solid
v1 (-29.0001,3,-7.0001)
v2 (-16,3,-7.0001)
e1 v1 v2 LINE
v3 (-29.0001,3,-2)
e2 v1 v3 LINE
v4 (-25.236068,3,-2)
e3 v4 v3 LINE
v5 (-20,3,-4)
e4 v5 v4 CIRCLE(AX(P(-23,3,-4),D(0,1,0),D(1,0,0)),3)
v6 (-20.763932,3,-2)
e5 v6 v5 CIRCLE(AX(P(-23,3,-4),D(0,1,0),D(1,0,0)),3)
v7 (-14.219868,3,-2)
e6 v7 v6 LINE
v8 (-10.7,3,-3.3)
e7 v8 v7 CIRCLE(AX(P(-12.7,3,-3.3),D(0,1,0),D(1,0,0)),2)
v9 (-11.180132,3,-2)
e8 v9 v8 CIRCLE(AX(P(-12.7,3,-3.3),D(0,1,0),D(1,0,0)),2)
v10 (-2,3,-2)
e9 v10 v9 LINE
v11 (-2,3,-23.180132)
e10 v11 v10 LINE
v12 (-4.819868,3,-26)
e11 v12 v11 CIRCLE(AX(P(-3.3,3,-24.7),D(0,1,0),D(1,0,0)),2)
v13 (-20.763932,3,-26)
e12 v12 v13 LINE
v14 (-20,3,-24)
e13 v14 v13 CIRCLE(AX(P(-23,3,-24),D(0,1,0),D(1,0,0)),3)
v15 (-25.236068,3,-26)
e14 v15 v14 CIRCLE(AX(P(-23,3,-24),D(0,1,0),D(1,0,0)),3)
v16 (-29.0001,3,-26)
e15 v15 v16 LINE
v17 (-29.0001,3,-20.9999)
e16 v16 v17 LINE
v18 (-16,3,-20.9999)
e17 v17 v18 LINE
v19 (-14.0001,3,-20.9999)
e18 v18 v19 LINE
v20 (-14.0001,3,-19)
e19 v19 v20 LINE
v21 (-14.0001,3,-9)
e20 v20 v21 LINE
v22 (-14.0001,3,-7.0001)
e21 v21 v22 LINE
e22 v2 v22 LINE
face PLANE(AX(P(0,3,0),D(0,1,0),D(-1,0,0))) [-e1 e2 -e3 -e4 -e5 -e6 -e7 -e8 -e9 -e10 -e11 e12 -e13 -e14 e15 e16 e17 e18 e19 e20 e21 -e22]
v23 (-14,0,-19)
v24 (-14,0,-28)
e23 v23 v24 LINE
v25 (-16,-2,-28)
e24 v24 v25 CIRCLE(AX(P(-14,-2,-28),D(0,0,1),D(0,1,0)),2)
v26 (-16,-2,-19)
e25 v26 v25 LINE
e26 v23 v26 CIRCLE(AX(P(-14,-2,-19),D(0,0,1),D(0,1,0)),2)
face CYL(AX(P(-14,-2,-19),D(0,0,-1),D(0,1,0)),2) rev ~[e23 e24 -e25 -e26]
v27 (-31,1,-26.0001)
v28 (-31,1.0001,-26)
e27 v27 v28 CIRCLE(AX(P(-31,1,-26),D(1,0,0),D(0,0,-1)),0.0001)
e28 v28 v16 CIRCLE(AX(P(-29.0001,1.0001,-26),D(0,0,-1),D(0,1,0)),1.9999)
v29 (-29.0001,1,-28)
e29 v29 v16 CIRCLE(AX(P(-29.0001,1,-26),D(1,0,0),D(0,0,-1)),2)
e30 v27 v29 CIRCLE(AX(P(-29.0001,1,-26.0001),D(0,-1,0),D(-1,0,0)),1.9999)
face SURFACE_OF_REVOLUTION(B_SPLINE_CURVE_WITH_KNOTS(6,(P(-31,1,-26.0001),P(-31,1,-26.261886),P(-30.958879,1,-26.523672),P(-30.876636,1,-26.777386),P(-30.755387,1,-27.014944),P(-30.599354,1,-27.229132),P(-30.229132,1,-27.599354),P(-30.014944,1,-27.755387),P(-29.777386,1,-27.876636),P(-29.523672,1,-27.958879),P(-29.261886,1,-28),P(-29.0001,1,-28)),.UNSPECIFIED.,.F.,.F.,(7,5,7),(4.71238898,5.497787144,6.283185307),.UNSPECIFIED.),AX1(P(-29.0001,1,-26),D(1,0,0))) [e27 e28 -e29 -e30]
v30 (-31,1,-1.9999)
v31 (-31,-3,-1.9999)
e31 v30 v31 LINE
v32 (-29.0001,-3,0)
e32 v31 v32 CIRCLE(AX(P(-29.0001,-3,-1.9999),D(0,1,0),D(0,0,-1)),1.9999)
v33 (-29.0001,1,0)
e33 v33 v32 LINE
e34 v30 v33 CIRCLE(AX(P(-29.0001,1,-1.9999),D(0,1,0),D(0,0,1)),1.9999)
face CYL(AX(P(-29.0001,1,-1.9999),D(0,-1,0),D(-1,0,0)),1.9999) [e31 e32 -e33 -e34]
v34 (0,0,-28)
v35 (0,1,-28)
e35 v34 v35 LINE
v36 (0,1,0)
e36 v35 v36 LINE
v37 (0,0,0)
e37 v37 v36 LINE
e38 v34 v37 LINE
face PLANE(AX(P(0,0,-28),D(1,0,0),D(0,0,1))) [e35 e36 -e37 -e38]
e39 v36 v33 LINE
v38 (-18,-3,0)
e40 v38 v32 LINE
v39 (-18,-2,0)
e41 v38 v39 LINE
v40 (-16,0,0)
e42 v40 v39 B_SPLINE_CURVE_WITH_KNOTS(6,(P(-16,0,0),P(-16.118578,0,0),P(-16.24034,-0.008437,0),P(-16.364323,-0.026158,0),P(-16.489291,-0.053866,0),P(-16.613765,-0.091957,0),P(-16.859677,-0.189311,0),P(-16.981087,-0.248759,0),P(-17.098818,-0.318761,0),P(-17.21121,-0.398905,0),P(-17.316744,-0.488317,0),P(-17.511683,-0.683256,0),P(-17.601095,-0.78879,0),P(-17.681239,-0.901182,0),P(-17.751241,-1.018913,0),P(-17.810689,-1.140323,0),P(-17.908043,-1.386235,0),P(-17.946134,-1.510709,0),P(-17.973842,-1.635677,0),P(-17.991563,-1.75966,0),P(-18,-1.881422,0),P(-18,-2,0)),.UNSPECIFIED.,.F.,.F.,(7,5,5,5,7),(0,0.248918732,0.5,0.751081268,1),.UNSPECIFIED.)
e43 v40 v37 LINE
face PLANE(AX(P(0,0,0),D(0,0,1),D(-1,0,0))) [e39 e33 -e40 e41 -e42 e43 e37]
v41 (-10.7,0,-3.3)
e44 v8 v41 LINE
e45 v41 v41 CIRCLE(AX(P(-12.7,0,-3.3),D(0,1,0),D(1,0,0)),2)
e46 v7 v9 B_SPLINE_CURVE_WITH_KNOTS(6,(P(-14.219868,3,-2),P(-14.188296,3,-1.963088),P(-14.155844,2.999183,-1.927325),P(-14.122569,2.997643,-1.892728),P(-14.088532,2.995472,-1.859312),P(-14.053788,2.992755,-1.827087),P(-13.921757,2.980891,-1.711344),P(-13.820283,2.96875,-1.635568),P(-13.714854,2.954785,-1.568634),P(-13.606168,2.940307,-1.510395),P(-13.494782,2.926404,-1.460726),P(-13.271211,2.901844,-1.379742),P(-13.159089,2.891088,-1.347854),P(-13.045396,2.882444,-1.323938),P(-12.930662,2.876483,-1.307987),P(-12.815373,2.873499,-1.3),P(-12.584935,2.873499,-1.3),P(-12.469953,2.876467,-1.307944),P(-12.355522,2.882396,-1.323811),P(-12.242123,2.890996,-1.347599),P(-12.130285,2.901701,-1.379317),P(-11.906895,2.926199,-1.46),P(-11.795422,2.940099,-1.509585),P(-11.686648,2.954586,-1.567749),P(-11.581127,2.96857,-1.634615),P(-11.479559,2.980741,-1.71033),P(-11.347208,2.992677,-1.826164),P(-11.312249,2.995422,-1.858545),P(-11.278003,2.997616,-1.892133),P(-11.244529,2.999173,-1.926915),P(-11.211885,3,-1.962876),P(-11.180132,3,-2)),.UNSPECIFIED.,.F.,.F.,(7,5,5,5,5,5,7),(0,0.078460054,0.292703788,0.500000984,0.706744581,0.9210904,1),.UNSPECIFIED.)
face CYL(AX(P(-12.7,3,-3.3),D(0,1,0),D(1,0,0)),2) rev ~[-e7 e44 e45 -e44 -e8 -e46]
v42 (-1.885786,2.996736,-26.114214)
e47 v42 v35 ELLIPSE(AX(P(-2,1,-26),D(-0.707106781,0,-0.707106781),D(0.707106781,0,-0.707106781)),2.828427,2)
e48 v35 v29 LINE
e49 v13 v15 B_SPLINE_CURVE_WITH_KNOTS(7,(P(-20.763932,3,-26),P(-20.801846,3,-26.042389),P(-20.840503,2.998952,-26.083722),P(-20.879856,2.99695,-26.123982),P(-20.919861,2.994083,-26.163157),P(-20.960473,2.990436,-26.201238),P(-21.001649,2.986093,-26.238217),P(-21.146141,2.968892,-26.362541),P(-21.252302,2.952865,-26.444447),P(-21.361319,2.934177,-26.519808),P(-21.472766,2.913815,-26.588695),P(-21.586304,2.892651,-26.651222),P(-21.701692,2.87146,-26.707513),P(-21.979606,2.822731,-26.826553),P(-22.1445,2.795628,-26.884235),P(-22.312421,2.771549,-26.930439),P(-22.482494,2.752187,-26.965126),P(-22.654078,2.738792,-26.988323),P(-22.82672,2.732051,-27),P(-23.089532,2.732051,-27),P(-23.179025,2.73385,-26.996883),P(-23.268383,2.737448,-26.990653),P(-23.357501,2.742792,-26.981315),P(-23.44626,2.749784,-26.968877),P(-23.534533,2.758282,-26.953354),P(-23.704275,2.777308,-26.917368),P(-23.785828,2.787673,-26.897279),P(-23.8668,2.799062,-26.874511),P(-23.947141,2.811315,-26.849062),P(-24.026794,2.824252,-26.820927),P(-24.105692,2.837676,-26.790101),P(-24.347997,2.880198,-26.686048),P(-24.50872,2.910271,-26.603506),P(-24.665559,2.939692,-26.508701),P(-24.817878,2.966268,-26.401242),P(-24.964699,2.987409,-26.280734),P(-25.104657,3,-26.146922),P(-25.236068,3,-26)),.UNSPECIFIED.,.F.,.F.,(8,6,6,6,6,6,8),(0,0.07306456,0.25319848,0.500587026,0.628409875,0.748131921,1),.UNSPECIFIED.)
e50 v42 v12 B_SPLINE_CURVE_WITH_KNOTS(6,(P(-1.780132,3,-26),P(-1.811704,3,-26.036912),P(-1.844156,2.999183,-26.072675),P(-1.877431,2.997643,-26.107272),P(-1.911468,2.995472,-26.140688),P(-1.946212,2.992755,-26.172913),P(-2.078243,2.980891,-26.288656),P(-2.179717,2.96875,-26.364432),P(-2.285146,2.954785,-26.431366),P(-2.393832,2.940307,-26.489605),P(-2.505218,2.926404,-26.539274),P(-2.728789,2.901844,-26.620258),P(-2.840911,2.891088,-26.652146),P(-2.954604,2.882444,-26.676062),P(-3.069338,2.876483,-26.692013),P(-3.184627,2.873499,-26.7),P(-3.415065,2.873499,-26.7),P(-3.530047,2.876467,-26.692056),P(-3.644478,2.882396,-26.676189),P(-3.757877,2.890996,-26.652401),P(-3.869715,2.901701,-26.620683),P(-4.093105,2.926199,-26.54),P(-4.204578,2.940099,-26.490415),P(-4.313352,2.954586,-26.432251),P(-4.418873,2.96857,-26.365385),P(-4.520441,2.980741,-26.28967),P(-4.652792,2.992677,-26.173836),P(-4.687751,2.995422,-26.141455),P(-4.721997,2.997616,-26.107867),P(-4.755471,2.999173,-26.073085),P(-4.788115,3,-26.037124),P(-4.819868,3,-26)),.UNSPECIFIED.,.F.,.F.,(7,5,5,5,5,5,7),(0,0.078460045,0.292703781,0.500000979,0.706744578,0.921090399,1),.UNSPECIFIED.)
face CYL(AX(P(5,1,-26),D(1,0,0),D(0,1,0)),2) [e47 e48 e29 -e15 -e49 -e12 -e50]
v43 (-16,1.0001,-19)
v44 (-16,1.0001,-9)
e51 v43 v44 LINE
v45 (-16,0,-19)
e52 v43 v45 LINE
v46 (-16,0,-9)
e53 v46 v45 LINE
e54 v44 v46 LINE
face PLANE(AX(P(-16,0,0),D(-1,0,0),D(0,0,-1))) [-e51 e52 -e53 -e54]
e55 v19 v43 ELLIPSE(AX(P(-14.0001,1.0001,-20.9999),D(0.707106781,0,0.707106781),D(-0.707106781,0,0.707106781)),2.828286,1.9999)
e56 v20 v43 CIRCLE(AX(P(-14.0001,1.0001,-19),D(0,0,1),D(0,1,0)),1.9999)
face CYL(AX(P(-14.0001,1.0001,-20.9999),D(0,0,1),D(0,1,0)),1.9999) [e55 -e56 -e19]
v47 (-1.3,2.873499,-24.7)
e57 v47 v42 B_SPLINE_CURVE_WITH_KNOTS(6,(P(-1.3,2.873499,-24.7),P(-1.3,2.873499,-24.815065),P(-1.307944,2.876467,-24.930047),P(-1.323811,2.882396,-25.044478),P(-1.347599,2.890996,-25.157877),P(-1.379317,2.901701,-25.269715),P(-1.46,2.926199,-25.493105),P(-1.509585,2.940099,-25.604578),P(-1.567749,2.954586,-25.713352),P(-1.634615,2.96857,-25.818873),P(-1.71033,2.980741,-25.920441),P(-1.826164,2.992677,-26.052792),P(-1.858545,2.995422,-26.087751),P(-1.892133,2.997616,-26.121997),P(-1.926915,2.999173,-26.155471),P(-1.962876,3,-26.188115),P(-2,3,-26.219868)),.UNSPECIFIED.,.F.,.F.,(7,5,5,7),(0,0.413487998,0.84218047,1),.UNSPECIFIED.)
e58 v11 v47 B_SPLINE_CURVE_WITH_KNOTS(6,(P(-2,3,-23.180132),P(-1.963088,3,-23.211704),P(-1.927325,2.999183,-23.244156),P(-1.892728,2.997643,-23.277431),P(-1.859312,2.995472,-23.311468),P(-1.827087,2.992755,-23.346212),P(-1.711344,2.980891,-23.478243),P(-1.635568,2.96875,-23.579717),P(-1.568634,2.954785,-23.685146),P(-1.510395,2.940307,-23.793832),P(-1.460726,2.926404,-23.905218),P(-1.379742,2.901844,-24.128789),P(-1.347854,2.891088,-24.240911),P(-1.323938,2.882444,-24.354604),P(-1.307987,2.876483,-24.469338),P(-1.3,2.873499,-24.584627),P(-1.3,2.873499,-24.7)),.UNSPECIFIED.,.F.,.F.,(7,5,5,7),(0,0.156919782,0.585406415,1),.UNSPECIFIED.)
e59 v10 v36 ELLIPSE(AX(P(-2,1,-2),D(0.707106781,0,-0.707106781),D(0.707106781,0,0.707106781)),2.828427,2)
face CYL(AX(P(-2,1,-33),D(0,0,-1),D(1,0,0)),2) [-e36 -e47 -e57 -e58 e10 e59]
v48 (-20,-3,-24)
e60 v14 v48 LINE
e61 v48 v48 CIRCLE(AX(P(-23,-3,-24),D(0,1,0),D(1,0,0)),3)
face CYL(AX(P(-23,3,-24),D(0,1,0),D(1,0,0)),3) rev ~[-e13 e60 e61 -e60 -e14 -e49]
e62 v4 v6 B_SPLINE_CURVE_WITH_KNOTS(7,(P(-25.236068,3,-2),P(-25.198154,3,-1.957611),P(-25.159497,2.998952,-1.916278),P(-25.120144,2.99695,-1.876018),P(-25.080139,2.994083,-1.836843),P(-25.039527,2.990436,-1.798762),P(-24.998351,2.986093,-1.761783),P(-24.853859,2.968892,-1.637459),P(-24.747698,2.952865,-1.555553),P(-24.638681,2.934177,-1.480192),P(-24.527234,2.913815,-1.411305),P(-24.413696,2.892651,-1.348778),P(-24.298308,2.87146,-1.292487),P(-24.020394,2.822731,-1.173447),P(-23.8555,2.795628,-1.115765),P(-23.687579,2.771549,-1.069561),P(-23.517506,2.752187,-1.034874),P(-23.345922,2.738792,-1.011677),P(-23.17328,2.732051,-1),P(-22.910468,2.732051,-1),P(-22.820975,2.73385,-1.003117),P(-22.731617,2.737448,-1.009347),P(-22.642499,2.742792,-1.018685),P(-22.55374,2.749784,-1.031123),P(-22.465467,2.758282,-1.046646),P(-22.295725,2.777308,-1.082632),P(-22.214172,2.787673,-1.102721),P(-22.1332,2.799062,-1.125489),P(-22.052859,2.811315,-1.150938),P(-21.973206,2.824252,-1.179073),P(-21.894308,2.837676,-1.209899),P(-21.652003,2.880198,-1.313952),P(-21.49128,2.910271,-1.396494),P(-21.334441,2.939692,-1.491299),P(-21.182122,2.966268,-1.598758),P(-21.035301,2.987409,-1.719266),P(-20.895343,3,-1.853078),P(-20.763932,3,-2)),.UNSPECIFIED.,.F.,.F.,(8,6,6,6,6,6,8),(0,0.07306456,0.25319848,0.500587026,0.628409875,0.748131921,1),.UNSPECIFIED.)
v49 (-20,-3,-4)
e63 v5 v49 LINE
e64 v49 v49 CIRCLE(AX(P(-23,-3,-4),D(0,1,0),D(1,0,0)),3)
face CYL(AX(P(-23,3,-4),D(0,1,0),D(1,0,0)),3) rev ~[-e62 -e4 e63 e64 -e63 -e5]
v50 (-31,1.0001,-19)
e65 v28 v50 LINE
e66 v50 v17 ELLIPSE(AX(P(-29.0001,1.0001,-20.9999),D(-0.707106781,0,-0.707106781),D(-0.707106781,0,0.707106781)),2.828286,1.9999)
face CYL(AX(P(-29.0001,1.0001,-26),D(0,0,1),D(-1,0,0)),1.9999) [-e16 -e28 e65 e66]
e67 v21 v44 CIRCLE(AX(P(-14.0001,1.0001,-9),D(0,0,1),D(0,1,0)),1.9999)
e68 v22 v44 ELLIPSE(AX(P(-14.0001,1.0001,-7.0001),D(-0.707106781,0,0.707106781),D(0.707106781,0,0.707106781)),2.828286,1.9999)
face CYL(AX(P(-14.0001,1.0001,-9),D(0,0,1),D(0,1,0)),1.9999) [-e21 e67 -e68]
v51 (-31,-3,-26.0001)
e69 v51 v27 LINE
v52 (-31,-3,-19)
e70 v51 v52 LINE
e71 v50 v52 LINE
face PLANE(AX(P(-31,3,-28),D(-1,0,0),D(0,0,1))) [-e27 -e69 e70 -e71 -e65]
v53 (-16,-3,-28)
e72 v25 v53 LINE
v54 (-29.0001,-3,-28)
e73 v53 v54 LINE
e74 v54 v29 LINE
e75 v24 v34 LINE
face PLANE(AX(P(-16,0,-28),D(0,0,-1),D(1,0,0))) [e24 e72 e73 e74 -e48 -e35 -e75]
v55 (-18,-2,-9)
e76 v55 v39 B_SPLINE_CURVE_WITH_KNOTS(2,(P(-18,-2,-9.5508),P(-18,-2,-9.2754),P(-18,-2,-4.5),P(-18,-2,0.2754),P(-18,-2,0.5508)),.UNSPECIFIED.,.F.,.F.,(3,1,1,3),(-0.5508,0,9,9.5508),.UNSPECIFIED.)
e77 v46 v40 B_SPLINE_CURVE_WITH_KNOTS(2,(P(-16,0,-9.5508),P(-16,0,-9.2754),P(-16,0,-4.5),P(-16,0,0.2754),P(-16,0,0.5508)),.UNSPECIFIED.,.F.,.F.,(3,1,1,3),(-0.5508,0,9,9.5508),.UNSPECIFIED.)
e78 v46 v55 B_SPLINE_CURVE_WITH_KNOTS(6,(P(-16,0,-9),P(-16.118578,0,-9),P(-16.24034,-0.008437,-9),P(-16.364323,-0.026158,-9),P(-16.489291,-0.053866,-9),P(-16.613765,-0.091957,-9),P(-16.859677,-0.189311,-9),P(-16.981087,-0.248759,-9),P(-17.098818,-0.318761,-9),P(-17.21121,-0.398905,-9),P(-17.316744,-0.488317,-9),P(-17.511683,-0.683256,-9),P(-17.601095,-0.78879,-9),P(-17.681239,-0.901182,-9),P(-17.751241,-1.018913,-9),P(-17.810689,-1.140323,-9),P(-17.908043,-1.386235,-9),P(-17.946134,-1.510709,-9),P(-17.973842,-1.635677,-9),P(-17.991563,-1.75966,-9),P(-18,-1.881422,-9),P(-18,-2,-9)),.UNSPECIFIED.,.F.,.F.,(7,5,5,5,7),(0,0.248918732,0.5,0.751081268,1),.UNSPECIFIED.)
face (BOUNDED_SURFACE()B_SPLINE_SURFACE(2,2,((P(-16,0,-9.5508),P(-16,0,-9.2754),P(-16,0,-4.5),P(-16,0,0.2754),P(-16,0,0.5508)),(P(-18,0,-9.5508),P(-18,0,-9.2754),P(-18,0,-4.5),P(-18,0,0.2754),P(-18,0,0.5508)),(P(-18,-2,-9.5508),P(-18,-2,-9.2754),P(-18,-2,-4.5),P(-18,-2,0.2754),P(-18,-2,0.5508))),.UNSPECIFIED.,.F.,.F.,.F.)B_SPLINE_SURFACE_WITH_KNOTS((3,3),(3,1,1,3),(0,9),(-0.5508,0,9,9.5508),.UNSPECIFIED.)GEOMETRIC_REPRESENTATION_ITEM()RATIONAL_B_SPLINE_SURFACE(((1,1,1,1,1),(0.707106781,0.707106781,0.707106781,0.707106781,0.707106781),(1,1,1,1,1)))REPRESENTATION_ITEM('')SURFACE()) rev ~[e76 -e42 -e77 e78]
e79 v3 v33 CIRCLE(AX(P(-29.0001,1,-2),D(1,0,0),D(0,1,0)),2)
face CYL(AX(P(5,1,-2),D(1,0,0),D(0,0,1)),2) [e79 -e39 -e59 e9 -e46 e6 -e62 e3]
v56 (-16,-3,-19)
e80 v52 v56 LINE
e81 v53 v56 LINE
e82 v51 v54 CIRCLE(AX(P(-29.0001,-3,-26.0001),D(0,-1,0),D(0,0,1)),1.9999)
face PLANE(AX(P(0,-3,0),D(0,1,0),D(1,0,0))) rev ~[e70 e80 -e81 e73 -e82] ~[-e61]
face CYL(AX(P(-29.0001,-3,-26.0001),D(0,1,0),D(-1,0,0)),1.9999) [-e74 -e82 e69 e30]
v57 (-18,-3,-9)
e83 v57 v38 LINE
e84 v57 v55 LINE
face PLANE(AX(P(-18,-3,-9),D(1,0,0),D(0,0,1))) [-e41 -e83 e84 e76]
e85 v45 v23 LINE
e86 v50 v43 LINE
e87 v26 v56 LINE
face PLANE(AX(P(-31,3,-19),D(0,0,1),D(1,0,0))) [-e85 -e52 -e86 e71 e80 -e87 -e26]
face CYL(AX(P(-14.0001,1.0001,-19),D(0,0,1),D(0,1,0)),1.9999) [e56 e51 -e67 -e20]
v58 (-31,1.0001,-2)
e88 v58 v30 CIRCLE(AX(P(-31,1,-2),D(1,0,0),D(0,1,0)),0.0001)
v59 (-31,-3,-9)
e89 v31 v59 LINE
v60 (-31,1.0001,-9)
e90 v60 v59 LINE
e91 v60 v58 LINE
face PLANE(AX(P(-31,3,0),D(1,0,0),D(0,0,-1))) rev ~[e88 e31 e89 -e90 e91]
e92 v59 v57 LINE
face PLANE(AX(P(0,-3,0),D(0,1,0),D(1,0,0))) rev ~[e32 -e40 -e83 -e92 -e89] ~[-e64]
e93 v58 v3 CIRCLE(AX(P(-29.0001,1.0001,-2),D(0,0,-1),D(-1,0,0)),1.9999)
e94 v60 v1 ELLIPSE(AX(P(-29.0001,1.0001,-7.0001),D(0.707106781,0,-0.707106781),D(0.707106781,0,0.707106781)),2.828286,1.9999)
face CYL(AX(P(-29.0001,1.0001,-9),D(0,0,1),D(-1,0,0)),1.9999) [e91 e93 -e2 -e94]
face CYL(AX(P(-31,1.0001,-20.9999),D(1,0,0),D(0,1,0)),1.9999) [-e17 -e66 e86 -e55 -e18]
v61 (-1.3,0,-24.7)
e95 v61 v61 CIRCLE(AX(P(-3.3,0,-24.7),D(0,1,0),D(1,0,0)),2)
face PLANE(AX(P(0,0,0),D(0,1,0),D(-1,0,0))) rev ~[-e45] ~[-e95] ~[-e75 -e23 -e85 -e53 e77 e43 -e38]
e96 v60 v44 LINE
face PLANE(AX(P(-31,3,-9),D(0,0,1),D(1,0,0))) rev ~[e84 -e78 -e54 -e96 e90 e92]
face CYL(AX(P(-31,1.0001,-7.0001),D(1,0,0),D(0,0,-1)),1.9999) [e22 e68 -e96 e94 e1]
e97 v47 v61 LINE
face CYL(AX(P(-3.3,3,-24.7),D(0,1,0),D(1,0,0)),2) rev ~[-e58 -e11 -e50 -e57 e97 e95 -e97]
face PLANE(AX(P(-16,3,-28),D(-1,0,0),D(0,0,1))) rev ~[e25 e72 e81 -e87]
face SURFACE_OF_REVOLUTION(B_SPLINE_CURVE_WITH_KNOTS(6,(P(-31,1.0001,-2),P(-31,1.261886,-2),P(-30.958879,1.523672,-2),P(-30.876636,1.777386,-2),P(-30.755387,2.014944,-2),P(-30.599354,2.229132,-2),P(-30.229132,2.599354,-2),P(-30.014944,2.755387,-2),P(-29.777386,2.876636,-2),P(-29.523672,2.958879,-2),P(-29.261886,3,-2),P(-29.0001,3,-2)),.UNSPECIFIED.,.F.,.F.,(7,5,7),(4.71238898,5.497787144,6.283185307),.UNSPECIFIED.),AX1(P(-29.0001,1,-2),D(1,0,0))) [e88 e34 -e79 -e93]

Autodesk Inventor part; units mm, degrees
ref_plane "YZ Plane" through (0, 0, 0) normal (1, 0, 0) x (0, 1, 0)
ref_plane "XZ Plane" through (0, 0, 0) normal (0, 1, 0) x (-1, 0, 0)
ref_plane "XY Plane" through (0, 0, 0) normal (0, 0, 1) x (1, 0, 0)
sketch "Sketch1" plane through (0, 0, 0) normal (0, 1, 0) x (-1, 0, 0)
  line L0 (0, 0) -> (16, 0)
  line L1 (16, 0) -> (16, -28)
  line L2 (16, -28) -> (0, -28)
  line L3 (0, -28) -> (0, 0)
  dimension "d0" = 16
  dimension "d1" = 28
extrude "Extrusion1" add sketch "Sketch1" along normal blind 3
sketch "Sketch2" plane through (0, 3, 0) normal (0, 1, 0) x (1, 0, 0)
  circle A0 centre (-3.3, 24.7) radius 2
  circle A1 centre (-12.7, 3.3) radius 2
  line L0 (0, 28) -> (-16, 28) projected
  line L1 (0, 0) -> (0, 28) projected
  line L2 (-16, 28) -> (-16, 0) projected
  line L3 (-16, 0) -> (0, 0) projected
  dimension "d4" = 4
  dimension "d5" = 4
  dimension "d6" = 3.3
  dimension "d7" = 3.3
  dimension "d8" = 3.3
  dimension "d9" = 3.3
extrude "Extrusion2" cut sketch "Sketch2" against normal blind 3.3 contours A0 | A1
sketch "Sketch10" plane through (0, 3, 0) normal (0, 1, 0) x (1, 0, 0)
  line L0 (-16, 28) -> (-16, 0) projected
  line L1 (-16, 14) -> (-16, 4)
  line L2 (-16, 4) -> (-24, 4)
  line L3 (-16, 0) -> (0, 0) projected
  line L4 (-16, 0) -> (-31, 0)
  line L5 (-31, 0) -> (-31, 9)
  line L6 (-31, 9) -> (-16, 9)
  line L7 (-16, 9) -> (-16, 0)
  line L8 (0, 28) -> (-16, 28) projected
  line L9 (-16, 28) -> (-31, 28)
  line L10 (-31, 28) -> (-31, 19)
  line L11 (-31, 19) -> (-16, 19)
  line L12 (-16, 19) -> (-16, 28)
  dimension "d52" = 10
  dimension "d53" = 8
  dimension "d54" = 15
  dimension "d55" = 9
  dimension "d56" = 15
  dimension "d57" = 9
extrude "Extrusion9" add sketch "Sketch10" against normal blind 6
sketch "Sketch11" plane through (0, 3, 0) normal (0, 1, 0) x (1, 0, 0)
  circle A0 centre (-23, 4) radius 3
  circle A1 centre (-23, 24) radius 3
  line L0 (-31, 0) -> (0, 0) projected
  line L1 (-31, 9) -> (-31, 0) projected
  line L2 (-31, 28) -> (-31, 19) projected
  dimension "d60" = 6
  dimension "d61" = 6
  dimension "d62" = 4
  dimension "d63" = 20
  dimension "d64" = 8
  dimension "d65" = 8
extrude "Extrusion10" cut sketch "Sketch11" against normal through all
sketch "Sketch12" plane through (0, -3, 0) normal (0, -1, 0) x (1, 0, 0)
  line L0 (-16, -9) -> (-31, -9) projected
  line L1 (-16, -9) -> (-18, -9)
  line L2 (-18, -9) -> (-18, 0)
  line L3 (-18, 0) -> (-16, 0)
  line L4 (-16, 0) -> (-16, -9)
  point P0 (0, 0)
  dimension "d68" = 2
  dimension "d69" = 9
extrude "Extrusion11" cut sketch "Sketch12" against normal blind 3
fillet "Fillet1" radius 2 2 edges at (-16, 0, -23.5) (-18, 0, -4.5)
fillet "Fillet2" radius 2 3 edges at (-15.5, 3, 0) (0, 3, -14) (-15.5, 3, -28)
fillet "Fillet3" radius 2 8 edges at (-31, 2.4142, -27.4142) (-31, -1, -28) (-31, 3, -22.5) (-23.5, 3, -19) (-23.5, 3, -9) (-31, 2.4142, -0.5858) (-31, -1, 0) (-31, 3, -5.5)
fillet "Fillet4" radius 2 2 edges at (-16, 3, -8) (-16, 3, -20)
equation "\"d10\" = d7"
properties part number "Limit_SwitchMount"
